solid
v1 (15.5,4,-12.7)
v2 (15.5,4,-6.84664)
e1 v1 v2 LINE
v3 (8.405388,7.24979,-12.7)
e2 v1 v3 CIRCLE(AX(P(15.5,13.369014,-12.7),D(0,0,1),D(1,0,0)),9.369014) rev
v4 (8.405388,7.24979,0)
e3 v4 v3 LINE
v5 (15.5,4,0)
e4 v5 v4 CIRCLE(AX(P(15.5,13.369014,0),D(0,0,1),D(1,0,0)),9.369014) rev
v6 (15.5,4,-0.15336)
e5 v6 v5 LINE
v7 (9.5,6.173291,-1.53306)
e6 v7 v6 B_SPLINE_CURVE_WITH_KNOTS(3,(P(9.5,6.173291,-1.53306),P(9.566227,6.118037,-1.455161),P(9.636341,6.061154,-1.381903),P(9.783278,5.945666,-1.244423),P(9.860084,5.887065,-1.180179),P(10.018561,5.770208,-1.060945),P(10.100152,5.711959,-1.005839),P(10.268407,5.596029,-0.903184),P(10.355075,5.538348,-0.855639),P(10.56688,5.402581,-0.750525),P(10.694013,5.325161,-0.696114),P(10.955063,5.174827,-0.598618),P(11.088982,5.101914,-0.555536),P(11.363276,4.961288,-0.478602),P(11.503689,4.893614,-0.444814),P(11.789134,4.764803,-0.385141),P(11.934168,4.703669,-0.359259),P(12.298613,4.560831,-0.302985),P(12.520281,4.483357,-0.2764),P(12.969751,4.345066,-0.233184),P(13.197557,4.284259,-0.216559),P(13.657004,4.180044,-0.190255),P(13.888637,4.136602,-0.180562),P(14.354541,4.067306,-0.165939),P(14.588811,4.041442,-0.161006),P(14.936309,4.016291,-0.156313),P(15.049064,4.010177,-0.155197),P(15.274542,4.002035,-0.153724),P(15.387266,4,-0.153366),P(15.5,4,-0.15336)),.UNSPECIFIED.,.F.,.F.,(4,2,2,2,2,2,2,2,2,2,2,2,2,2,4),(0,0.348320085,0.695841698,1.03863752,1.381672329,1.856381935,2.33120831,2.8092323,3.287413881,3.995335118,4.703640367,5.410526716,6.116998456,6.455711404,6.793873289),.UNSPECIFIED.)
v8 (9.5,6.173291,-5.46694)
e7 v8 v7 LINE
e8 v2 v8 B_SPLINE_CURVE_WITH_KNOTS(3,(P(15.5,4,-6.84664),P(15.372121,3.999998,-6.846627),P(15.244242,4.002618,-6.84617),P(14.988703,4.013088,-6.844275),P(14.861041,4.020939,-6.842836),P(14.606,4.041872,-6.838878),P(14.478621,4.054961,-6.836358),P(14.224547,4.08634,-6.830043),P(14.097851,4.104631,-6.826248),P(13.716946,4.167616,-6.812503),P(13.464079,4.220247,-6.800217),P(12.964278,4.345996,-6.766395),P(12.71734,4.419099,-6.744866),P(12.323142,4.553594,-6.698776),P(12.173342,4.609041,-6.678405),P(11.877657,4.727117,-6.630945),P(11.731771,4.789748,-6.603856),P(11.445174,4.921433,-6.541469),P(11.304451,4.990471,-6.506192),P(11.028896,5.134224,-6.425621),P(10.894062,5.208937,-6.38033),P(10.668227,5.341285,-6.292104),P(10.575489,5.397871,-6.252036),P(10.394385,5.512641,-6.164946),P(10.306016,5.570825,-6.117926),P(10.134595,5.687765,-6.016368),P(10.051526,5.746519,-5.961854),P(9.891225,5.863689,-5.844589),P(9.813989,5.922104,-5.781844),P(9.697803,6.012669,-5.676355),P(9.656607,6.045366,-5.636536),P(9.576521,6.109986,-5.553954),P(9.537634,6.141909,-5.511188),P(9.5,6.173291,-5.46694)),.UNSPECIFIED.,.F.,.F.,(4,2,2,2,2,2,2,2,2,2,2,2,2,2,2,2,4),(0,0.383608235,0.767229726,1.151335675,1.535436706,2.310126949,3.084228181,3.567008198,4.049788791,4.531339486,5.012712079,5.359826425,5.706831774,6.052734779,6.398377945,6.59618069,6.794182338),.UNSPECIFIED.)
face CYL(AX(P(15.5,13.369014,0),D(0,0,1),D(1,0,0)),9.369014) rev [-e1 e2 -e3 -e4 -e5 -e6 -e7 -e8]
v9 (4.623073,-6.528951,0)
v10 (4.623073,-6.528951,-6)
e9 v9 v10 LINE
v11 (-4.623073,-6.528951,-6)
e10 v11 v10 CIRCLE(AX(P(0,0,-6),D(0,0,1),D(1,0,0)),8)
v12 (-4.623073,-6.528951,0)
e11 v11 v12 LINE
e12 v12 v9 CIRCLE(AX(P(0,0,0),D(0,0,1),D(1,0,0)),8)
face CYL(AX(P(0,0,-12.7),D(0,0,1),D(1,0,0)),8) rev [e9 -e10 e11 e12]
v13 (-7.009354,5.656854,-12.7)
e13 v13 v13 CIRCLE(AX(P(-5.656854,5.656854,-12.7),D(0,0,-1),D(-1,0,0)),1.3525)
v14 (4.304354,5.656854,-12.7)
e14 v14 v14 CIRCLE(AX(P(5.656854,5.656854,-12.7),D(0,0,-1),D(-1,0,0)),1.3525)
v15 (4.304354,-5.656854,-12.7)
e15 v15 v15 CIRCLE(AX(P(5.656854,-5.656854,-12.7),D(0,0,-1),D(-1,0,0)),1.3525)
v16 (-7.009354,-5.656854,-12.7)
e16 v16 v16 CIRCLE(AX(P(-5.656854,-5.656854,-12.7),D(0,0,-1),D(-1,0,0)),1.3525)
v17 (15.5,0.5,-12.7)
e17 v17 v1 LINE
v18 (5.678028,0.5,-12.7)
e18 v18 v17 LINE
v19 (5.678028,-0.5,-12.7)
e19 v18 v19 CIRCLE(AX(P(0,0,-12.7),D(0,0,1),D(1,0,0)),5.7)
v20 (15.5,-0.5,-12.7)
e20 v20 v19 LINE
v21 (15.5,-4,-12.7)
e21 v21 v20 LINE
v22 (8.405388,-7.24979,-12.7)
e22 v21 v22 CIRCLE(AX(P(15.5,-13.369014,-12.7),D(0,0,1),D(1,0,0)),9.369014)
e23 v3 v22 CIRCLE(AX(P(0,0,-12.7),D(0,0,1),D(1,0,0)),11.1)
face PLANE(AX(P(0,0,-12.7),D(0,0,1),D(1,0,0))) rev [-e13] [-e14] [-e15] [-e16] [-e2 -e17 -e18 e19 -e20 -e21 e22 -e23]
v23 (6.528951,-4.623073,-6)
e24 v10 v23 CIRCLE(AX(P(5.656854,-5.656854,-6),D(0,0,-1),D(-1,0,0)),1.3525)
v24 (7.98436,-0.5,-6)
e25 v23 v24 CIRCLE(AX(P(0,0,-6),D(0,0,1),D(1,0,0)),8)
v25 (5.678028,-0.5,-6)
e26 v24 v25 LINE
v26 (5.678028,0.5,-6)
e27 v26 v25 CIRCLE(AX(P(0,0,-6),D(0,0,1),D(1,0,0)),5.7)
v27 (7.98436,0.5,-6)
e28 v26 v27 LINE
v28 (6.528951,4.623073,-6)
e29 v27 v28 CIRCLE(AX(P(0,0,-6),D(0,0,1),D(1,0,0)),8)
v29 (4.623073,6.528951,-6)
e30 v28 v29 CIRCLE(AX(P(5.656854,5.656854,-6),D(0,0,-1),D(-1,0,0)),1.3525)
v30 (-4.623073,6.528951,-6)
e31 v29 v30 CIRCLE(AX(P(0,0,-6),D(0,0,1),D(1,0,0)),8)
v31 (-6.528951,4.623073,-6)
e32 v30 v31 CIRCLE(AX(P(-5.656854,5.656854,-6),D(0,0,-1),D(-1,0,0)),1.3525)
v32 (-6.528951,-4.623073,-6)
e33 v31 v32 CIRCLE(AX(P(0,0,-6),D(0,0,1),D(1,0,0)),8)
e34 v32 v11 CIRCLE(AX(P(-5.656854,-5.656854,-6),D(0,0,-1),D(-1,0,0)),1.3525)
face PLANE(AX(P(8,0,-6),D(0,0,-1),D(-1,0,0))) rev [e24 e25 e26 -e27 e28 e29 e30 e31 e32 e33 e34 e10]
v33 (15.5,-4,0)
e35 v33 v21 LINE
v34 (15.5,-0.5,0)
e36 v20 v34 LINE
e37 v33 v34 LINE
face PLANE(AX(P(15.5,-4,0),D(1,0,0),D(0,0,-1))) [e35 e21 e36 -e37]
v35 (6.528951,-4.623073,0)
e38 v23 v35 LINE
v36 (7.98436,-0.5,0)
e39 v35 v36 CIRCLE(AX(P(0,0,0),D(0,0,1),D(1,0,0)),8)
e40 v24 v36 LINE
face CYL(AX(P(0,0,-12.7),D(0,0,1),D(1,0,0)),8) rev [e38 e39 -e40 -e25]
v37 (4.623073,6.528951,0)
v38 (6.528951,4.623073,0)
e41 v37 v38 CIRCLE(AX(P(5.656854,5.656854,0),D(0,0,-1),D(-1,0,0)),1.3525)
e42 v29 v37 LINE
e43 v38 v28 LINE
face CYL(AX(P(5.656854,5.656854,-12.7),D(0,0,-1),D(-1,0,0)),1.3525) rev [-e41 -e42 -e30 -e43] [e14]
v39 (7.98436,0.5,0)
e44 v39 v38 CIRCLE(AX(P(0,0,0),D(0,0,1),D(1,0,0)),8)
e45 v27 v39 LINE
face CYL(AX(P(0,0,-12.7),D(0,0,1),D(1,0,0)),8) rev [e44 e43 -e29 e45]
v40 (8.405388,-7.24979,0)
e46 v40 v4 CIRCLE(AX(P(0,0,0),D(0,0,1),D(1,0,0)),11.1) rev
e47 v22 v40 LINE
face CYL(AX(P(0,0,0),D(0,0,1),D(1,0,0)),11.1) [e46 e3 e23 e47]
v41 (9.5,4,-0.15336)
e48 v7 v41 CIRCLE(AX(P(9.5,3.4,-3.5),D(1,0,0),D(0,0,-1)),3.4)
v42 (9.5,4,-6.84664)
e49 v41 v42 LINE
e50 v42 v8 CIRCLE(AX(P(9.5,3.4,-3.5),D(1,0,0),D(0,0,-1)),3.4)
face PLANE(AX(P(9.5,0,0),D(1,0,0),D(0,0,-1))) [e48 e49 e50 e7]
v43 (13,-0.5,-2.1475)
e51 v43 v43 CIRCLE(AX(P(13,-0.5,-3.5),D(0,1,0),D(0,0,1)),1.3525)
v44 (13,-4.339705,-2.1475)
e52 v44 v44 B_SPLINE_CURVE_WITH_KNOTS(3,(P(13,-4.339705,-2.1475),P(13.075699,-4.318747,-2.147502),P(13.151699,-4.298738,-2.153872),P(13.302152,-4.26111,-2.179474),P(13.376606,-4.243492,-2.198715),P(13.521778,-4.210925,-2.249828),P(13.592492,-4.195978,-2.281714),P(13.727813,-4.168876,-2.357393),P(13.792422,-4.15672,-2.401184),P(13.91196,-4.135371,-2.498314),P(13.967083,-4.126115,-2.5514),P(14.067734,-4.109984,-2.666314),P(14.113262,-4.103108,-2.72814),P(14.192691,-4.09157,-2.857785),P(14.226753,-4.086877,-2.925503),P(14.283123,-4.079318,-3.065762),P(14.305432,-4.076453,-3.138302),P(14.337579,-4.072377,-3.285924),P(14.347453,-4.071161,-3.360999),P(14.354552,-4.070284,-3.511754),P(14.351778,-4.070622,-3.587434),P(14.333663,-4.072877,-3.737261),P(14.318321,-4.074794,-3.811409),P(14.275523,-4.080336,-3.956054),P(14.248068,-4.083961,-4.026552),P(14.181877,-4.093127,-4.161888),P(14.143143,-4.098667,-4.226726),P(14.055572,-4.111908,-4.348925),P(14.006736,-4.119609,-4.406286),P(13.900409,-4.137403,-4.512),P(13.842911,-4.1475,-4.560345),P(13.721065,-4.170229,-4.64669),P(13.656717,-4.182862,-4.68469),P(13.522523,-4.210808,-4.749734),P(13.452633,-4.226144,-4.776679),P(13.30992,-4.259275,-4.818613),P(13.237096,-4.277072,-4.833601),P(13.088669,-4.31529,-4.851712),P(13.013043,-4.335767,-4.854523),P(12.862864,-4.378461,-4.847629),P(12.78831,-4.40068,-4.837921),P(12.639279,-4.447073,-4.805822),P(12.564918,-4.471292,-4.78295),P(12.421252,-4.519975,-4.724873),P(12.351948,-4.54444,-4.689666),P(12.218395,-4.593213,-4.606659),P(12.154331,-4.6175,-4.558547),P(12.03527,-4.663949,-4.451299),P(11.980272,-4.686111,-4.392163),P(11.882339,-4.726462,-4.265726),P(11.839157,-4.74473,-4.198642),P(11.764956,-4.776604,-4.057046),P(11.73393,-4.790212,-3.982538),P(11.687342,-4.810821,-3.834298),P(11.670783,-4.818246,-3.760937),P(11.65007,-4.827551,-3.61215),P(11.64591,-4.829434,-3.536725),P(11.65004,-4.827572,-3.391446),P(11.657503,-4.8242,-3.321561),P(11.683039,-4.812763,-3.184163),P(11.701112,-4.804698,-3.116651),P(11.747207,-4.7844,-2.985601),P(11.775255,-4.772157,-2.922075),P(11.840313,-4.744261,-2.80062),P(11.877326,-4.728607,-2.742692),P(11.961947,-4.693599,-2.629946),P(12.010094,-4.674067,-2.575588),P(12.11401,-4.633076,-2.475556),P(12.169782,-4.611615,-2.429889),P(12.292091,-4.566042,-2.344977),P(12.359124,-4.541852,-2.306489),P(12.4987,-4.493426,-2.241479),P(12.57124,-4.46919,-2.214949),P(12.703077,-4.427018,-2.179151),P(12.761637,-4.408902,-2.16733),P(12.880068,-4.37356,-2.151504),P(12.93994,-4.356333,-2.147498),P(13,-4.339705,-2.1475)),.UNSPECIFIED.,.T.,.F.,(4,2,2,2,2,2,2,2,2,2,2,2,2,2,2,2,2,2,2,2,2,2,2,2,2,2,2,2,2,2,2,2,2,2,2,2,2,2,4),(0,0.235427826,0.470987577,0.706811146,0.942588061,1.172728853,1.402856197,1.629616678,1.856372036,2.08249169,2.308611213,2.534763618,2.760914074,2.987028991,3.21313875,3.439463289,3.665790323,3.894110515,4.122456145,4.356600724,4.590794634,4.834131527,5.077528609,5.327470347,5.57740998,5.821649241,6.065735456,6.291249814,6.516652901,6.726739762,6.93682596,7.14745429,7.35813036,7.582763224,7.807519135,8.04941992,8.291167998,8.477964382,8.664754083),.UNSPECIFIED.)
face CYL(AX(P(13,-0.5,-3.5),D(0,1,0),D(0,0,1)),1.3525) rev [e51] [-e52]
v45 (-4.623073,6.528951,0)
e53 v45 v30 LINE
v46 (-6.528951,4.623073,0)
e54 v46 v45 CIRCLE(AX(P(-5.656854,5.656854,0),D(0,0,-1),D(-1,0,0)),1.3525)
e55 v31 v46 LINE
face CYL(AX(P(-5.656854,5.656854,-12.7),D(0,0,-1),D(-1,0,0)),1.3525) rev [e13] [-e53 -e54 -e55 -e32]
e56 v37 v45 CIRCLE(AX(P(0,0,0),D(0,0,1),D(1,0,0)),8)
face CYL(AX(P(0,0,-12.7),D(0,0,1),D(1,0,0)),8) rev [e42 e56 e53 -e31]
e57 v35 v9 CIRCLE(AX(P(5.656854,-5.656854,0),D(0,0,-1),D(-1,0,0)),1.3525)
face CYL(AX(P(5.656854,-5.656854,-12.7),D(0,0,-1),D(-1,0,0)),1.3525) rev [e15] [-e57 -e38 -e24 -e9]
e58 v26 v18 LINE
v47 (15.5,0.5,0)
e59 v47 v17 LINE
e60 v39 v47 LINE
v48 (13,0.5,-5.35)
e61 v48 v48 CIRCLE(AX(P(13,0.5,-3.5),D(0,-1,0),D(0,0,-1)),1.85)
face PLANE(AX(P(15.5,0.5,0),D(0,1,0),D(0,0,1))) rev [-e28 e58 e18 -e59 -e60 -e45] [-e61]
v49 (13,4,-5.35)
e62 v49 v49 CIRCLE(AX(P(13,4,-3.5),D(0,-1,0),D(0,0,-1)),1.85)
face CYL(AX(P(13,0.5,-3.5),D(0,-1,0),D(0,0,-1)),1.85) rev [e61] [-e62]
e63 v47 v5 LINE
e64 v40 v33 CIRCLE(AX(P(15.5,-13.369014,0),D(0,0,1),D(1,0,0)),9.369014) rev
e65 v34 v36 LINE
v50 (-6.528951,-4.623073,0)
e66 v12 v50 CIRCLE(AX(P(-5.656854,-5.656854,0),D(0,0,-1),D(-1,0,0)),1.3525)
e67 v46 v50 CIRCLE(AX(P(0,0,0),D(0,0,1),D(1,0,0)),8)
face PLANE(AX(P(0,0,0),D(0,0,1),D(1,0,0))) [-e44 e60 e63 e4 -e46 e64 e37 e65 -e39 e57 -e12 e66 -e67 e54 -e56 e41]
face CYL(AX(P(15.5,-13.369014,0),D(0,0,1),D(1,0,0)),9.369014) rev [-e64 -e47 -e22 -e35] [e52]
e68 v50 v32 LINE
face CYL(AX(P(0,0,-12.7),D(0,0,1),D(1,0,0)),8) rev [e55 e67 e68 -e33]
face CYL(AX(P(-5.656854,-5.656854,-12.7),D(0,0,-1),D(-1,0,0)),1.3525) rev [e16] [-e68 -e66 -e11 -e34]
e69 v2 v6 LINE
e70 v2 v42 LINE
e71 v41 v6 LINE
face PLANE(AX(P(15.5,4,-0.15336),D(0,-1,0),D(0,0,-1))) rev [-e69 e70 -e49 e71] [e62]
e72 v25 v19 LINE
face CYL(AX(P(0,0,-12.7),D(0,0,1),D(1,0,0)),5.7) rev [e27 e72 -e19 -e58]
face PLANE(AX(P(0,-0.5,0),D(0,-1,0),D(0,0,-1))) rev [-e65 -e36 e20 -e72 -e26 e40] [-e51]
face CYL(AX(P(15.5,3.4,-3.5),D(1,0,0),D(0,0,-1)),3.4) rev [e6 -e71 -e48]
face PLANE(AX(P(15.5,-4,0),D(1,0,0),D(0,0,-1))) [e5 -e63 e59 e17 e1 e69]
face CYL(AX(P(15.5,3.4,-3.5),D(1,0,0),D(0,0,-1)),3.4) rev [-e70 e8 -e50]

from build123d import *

# Parameters (mm, degrees)
CUT_EXTRUDE1_START     = -12.7
CUT_EXTRUDE1_DEPTH     = 12.7
CUT_EXTRUDE1_START_2   = -7.233059634
CUT_EXTRUDE1_2_DEPTH   = 7.233059634
CUT_EXTRUDE1_3_DEPTH   = 6
CUT_EXTRUDE1_4_DEPTH   = 1.533059634
CUT_EXTRUDE1_START_3   = 9.5
CUT_EXTRUDE1_5_DEPTH   = 6.5
SKETCH3_W              = 1.3525
SKETCH3_H              = 10.6
M2_5_CLEARANCE_HOLE2_D = 2.705
SKETCH7_W              = 1.85
SKETCH7_H              = 10.6


with BuildPart() as part:
    # Cut-Extrude1: read off the stored shape, not the designer's step
    # Cut-Extrude1 outline → Cut-Extrude1 (new body)
    with BuildSketch(Plane(origin=(0, 0, -12.7), x_dir=(-1, 0, 0), z_dir=(0, 0, -1)).offset(CUT_EXTRUDE1_START)):
        with BuildLine():
            Line((-5.678027827, -0.5), (-15.5, -0.5))
            Line((-15.5, -0.5), (-15.5, -4))
            ThreePointArc((-15.5, -4), (-11.598248501, -4.851105882), (-8.405387738, -7.249790133))
            ThreePointArc((-8.405387738, -7.249790133), (11.1, 0), (-8.405387738, 7.249790133))
            ThreePointArc((-8.405387738, 7.249790133), (-8.930606577, 6.689081827), (-9.5, 6.173291403))
            Line((-9.5, 6.173291403), (-9.5, 4))
            Line((-9.5, 4), (-15.5, 4))
            Line((-15.5, 4), (-15.5, 0.5))
            Line((-15.5, 0.5), (-5.678027827, 0.5))
            ThreePointArc((-5.678027827, 0.5), (-5.7, 0), (-5.678027827, -0.5))
        make_face()
    extrude(amount=CUT_EXTRUDE1_DEPTH)

    # Cut-Extrude1 2 outline → Cut-Extrude1 2 (add)
    with BuildSketch(Plane(origin=(0, 0, -12.7), x_dir=(-1, 0, 0), z_dir=(0, 0, -1)).offset(CUT_EXTRUDE1_START_2)):
        with BuildLine():
            ThreePointArc((-9.5, 6.173291403), (-12.309263583, 4.560062613), (-15.5, 4))
            Line((-15.5, 4), (-9.5, 4))
            Line((-9.5, 4), (-9.5, 6.173291403))
        make_face()
    extrude(amount=CUT_EXTRUDE1_2_DEPTH)

    # Cut-Extrude1 3 outline → Cut-Extrude1 3 (add)
    with BuildSketch(Plane(origin=(0, 0, -12.7), x_dir=(-1, 0, 0), z_dir=(0, 0, -1)).offset(CUT_EXTRUDE1_START)):
        with BuildLine():
            ThreePointArc((-7.984359711, 0.5), (-8, 0), (-7.984359711, -0.5))
            Line((-7.984359711, -0.5), (-5.678027827, -0.5))
            ThreePointArc((-5.678027827, -0.5), (-5.7, 0), (-5.678027827, 0.5))
            Line((-5.678027827, 0.5), (-7.984359711, 0.5))
        make_face()
    extrude(amount=CUT_EXTRUDE1_3_DEPTH)

    # Cut-Extrude1 4 outline → Cut-Extrude1 4 (add)
    with BuildSketch(Plane(origin=(0, 0, -12.7), x_dir=(-1, 0, 0), z_dir=(0, 0, -1)).offset(CUT_EXTRUDE1_START)):
        with BuildLine():
            ThreePointArc((-9.5, 6.173291403), (-12.309263583, 4.560062613), (-15.5, 4))
            Line((-15.5, 4), (-9.5, 4))
            Line((-9.5, 4), (-9.5, 6.173291403))
        make_face()
    extrude(amount=CUT_EXTRUDE1_4_DEPTH)

    # Cut-Extrude1 5 outline → Cut-Extrude1 5 (cut)
    with BuildSketch(Plane.YZ.offset(CUT_EXTRUDE1_START_3)):
        with BuildLine():
            ThreePointArc((6.173291403, -1.533059534), (5.2222696, -0.629576076), (4, -0.153359894))
            Line((4, -0.153359894), (4, -1.533059634))
            Line((4, -1.533059634), (6.173291403, -1.533059534))
        make_face()
        with BuildLine():
            Line((6.173291403, -5.466940466), (4, -5.466940366))
            Line((4, -5.466940366), (4, -6.846640106))
            ThreePointArc((4, -6.846640106), (5.2222696, -6.370423924), (6.173291403, -5.466940466))
        make_face()
    extrude(amount=CUT_EXTRUDE1_5_DEPTH, mode=Mode.SUBTRACT)

    # Sketch2 → Cut-Revolve1 (revolve, cut)
    with BuildSketch(Plane(origin=(0, 0, 0), x_dir=(1, 0, 0), z_dir=(0, 1, 0))):
        Polygon((5.7, 12.7), (0, 12.7), (0, 0), (8, 0), (8, 6), (5.7, 6), align=None)
    revolve(axis=Axis((0, 0, -12.7), (0, 0, 1)), mode=Mode.SUBTRACT)

    # Sketch3 → M2.5 Clearance Hole1 (revolve, cut)
    with BuildSketch(Plane(origin=(13, -0.5, -3.5), x_dir=(0, 0, 1), z_dir=(1, 0, 0))):
        with Locations((0.67625, 5.3)):
            Rectangle(SKETCH3_W, SKETCH3_H)
    revolve(axis=Axis((13, 5.85, -3.5), (0, -1, 0)), mode=Mode.SUBTRACT)

    # M2.5 Clearance Hole2 (through all)
    with Locations(Plane(origin=(0, 0, -12.7), x_dir=(-1, 0, 0), z_dir=(0, 0, -1))):
        with Locations((-5.656854249, -5.656854249), (5.656854249, -5.656854249), (5.656854249, 5.656854249), (-5.656854249, 5.656854249)):
            Hole(M2_5_CLEARANCE_HOLE2_D / 2)

    # Sketch7 → Ø3.7 (3.7) Diameter Hole1 (revolve, cut)
    with BuildSketch(Plane(origin=(13, 0.5, -3.5), x_dir=(0, 0, -1), z_dir=(1, 0, 0))):
        with Locations((0.925, 5.3)):
            Rectangle(SKETCH7_W, SKETCH7_H)
    revolve(axis=Axis((13, -5.85, -3.5), (0, 1, 0)), mode=Mode.SUBTRACT)


solid = part.part
